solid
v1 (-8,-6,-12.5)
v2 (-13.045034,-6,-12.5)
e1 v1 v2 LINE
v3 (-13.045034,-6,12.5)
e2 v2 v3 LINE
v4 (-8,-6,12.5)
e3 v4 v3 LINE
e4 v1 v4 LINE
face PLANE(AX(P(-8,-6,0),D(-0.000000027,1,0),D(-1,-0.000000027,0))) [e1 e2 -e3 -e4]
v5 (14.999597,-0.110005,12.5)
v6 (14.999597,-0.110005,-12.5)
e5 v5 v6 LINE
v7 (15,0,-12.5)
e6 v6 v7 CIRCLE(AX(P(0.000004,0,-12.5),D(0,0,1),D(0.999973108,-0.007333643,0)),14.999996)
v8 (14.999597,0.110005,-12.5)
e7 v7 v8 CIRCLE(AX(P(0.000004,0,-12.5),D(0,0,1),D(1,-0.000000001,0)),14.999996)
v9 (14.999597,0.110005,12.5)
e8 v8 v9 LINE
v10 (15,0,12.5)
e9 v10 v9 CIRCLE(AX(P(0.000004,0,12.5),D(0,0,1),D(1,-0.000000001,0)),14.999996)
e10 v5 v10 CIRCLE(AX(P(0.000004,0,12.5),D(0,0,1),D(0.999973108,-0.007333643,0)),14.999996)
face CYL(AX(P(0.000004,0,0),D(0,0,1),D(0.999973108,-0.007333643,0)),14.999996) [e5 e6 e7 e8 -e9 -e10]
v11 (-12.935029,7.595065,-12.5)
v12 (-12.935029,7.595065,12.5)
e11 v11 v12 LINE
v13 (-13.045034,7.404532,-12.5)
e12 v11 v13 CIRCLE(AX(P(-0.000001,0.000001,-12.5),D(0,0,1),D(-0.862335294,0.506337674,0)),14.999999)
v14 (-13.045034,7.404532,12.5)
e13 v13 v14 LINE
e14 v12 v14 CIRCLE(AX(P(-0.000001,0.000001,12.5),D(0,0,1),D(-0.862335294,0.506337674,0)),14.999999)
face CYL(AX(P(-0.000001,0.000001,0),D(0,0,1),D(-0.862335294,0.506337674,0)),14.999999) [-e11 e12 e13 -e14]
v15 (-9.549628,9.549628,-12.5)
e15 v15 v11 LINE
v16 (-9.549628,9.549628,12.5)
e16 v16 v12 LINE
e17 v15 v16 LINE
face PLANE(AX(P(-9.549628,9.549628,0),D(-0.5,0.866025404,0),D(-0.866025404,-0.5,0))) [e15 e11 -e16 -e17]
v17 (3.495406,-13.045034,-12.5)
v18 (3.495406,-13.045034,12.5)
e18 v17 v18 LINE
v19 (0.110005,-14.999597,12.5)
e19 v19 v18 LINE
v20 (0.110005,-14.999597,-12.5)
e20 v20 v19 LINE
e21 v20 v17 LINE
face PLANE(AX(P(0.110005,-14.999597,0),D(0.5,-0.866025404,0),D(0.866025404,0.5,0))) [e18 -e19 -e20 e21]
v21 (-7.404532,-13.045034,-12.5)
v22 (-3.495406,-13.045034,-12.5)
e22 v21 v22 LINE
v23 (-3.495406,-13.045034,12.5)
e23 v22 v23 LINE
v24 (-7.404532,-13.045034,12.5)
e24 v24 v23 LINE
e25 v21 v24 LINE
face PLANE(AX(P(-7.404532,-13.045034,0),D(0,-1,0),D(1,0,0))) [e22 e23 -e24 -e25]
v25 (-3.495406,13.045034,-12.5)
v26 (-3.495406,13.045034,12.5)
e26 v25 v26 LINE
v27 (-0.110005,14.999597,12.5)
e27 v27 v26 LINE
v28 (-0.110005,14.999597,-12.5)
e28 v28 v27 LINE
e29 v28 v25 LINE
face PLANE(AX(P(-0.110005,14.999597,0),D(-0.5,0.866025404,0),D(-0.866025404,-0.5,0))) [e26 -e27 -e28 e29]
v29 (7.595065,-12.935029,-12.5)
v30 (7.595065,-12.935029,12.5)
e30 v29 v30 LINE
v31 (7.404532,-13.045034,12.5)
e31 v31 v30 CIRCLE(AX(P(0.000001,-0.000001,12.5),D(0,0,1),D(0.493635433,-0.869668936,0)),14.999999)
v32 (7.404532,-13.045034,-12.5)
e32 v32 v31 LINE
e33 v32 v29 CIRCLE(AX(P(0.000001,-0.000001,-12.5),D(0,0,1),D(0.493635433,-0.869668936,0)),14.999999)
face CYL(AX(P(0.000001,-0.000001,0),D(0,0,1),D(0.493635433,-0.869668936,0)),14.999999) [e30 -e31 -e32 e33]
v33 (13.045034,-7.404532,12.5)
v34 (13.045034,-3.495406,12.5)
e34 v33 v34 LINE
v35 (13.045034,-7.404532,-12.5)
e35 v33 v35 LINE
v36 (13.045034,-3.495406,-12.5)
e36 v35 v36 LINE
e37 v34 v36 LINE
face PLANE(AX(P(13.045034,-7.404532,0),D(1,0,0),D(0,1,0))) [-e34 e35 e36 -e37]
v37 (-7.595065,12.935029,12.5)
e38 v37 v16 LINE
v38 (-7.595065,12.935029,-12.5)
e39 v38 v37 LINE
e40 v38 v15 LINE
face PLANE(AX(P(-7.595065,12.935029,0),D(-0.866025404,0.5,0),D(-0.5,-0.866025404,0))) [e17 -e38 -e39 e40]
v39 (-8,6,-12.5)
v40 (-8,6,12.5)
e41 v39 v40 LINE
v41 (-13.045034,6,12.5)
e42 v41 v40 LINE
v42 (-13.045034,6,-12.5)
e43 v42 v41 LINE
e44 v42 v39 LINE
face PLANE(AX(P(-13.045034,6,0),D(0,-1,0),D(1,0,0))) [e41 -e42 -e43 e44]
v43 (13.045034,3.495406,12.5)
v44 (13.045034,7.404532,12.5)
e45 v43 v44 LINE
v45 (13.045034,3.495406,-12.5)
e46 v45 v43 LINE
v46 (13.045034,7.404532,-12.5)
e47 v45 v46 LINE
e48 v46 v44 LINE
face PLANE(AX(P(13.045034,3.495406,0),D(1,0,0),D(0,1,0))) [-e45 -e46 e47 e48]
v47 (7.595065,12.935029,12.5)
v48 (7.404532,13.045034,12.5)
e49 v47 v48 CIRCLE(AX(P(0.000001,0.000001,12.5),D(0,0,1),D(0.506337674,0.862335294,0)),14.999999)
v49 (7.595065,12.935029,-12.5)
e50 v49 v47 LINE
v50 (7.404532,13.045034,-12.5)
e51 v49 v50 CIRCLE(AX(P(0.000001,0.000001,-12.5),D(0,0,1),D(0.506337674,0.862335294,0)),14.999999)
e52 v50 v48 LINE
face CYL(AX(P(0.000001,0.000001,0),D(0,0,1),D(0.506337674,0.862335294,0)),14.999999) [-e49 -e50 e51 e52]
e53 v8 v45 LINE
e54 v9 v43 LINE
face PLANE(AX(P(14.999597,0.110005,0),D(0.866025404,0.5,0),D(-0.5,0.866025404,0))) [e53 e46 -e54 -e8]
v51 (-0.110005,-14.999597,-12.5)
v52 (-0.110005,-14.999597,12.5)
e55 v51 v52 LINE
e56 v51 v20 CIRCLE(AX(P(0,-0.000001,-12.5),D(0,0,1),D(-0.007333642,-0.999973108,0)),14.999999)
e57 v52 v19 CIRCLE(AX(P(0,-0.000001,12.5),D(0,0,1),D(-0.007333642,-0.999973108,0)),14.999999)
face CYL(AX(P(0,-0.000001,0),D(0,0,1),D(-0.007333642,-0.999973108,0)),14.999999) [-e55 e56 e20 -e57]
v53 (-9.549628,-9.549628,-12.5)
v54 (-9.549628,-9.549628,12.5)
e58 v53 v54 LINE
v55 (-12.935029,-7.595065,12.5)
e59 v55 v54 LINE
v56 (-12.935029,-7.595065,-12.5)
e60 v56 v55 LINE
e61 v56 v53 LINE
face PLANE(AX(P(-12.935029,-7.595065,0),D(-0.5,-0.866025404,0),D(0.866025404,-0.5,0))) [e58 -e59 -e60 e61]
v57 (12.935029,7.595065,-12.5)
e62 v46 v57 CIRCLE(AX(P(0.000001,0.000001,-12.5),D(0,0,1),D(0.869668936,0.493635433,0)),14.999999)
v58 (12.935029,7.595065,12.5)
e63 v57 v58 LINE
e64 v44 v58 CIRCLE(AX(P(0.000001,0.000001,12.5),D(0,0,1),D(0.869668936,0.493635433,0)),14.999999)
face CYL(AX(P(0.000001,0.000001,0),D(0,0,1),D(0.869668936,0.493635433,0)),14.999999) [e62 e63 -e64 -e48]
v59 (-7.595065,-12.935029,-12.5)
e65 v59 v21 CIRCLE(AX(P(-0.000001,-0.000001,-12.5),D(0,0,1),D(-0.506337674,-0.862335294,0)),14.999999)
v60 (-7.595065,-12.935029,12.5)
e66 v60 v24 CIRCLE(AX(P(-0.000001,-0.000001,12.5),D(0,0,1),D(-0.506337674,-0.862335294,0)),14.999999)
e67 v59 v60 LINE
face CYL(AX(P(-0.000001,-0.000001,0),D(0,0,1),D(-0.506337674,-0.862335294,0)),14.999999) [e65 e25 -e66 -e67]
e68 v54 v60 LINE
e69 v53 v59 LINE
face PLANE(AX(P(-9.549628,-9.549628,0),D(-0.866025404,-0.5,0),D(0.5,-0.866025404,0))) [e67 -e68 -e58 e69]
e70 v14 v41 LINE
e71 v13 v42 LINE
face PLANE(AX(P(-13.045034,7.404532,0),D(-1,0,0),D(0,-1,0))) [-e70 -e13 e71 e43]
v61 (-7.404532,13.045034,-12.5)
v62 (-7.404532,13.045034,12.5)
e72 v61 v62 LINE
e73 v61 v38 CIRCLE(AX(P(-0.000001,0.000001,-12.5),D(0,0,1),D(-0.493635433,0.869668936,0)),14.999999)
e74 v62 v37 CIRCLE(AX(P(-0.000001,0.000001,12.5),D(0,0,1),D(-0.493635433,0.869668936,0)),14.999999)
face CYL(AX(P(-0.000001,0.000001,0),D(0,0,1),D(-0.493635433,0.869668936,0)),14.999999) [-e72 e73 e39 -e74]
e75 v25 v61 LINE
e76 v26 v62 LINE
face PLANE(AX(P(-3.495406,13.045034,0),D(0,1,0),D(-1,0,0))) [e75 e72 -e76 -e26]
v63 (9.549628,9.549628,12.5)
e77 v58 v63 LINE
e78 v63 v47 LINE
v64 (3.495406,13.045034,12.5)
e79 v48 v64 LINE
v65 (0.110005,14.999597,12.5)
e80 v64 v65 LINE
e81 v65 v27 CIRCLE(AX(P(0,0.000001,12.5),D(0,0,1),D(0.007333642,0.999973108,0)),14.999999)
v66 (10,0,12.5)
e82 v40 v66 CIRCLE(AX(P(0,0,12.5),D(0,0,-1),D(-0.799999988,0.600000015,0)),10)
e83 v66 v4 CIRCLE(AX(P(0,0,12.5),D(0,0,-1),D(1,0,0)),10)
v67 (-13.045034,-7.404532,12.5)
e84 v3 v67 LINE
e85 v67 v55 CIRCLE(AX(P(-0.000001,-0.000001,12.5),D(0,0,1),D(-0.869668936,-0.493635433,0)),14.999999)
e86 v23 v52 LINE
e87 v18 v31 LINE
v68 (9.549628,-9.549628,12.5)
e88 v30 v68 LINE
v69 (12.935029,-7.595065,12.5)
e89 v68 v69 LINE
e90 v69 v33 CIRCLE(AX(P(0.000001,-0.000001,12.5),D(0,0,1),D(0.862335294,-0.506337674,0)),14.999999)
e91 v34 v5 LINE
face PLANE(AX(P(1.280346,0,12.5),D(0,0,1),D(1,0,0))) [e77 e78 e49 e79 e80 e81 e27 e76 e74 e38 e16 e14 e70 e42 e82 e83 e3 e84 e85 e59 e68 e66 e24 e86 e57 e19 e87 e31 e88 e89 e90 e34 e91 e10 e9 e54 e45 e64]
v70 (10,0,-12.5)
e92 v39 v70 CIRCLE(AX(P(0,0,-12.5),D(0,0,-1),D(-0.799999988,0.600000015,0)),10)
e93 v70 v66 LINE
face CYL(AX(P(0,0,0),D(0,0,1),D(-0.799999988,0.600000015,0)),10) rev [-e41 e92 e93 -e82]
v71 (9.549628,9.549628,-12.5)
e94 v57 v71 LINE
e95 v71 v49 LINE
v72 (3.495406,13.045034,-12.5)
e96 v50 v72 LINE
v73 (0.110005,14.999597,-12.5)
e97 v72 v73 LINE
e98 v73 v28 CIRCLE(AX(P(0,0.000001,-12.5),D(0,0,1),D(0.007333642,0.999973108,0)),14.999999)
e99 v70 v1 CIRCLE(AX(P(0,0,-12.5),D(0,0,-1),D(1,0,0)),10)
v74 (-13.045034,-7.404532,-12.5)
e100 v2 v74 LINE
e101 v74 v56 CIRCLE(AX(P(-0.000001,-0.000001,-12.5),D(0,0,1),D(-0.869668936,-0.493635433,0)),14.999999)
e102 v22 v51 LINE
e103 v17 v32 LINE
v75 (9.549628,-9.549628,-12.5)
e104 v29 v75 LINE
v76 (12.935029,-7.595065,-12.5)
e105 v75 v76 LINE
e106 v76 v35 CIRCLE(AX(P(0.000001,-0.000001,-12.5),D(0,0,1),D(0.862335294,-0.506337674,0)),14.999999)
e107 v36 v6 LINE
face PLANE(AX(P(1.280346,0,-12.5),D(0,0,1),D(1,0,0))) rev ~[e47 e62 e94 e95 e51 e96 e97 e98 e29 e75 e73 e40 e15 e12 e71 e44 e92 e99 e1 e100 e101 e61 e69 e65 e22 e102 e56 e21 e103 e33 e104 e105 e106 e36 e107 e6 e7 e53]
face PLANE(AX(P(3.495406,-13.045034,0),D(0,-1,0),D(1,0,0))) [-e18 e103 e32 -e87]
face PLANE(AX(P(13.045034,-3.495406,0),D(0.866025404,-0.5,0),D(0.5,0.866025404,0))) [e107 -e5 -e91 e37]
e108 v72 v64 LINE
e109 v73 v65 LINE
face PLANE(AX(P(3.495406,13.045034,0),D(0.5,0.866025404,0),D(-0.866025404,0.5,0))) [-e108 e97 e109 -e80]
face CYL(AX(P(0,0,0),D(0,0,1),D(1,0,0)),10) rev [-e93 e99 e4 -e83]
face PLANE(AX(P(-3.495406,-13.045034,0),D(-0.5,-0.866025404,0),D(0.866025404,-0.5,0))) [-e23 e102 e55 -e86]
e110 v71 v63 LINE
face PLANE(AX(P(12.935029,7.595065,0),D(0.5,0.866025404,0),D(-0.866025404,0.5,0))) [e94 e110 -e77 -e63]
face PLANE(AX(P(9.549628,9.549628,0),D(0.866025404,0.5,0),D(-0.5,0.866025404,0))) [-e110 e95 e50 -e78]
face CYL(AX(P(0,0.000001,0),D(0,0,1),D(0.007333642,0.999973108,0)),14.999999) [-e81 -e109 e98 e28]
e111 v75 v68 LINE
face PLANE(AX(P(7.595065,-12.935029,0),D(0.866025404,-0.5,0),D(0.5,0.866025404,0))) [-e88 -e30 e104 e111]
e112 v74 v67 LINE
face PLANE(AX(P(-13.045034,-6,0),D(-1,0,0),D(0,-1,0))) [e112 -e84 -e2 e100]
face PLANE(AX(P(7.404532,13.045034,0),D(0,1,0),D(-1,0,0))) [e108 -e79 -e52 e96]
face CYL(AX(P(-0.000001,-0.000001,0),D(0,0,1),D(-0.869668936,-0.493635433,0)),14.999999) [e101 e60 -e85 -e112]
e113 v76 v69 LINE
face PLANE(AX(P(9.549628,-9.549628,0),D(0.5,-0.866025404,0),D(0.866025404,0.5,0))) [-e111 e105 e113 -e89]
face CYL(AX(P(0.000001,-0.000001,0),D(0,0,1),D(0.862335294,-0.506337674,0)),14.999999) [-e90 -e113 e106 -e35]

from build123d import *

# Parameters (mm, degrees)
F1_DEPTH = 12.5


# Not quite as in the source:
# - ends of sketch curves that miss each other by under 0.0002 mm in the source are joined


with BuildPart() as f1:
    # F0 (on Top) → F1 (new body, symmetric)
    with BuildSketch(Plane.XY):
        with BuildLine():
            ThreePointArc((14.9995966273, -0.1100046231), (14.9998991565, -0.0550026813), (15, 0))
            ThreePointArc((15, 0), (14.9998991565, 0.0550026813), (14.9995966273, 0.1100046231))
            Line((14.9995966273, 0.1100046231), (13.0450340373, 3.4954063355))
            Line((13.0450340373, 3.4954063355), (13.0450340373, 7.4045315155))
            ThreePointArc((13.0450340373, 7.4045315155), (12.9903810568, 7.5), (12.9350294143, 7.5950651118))
            Line((12.9350294143, 7.5950651118), (9.5496277018, 9.5496277018))
            Line((9.5496277018, 9.5496277018), (7.5950651118, 12.9350294143))
            ThreePointArc((7.5950651118, 12.9350294143), (7.5, 12.9903810568), (7.4045315155, 13.0450340373))
            Line((7.4045315155, 13.0450340373), (3.4954063355, 13.0450340373))
            Line((3.4954063355, 13.0450340373), (0.1100046231, 14.9995966273))
            ThreePointArc((0.1100046231, 14.9995966273), (0, 15), (-0.1100046231, 14.9995966273))
            Line((-0.1100046231, 14.9995966273), (-3.4954063355, 13.0450340373))
            Line((-3.4954063355, 13.0450340373), (-7.4045315155, 13.0450340373))
            ThreePointArc((-7.4045315155, 13.0450340373), (-7.5, 12.9903810568), (-7.5950651118, 12.9350294143))
            Line((-7.5950651118, 12.9350294143), (-9.5496277018, 9.5496277018))
            Line((-9.5496277018, 9.5496277018), (-12.9350294143, 7.5950651118))
            ThreePointArc((-12.9350294143, 7.5950651118), (-12.9903810568, 7.5), (-13.0450340373, 7.4045315155))
            Line((-13.0450340373, 7.4045315155), (-13.0450340373, 6))
            Line((-13.0450340373, 6), (-8, 6))
            ThreePointArc((-8, 6), (3.1622775895, 9.4868327685), (9.9999997765, 0))
            ThreePointArc((9.9999997765, 0), (3.1622775895, -9.4868327685), (-7.9999998212, -5.9999998659))
            Line((-7.9999998212, -5.9999998659), (-13.0450340373, -6))
            Line((-13.0450340373, -6), (-13.0450340373, -7.4045315155))
            ThreePointArc((-13.0450340373, -7.4045315155), (-12.9903810568, -7.5), (-12.9350294143, -7.5950651118))
            Line((-12.9350294143, -7.5950651118), (-9.5496277018, -9.5496277018))
            Line((-9.5496277018, -9.5496277018), (-7.5950651118, -12.9350294143))
            ThreePointArc((-7.5950651118, -12.9350294143), (-7.5, -12.9903810568), (-7.4045315155, -13.0450340373))
            Line((-7.4045315155, -13.0450340373), (-3.4954063355, -13.0450340373))
            Line((-3.4954063355, -13.0450340373), (-0.1100046231, -14.9995966273))
            ThreePointArc((-0.1100046231, -14.9995966273), (0, -15), (0.1100046231, -14.9995966273))
            Line((0.1100046231, -14.9995966273), (3.4954063355, -13.0450340373))
            Line((3.4954063355, -13.0450340373), (7.4045315155, -13.0450340373))
            ThreePointArc((7.4045315155, -13.0450340373), (7.5, -12.9903810568), (7.5950651118, -12.9350294143))
            Line((7.5950651118, -12.9350294143), (9.5496277018, -9.5496277018))
            Line((9.5496277018, -9.5496277018), (12.9350294143, -7.5950651118))
            ThreePointArc((12.9350294143, -7.5950651118), (12.9903810568, -7.5), (13.0450340373, -7.4045315155))
            Line((13.0450340373, -7.4045315155), (13.0450340373, -3.4954063355))
            Line((13.0450340373, -3.4954063355), (14.9995966273, -0.1100046231))
        make_face()
    extrude(amount=F1_DEPTH, both=True)


solid = f1.part
